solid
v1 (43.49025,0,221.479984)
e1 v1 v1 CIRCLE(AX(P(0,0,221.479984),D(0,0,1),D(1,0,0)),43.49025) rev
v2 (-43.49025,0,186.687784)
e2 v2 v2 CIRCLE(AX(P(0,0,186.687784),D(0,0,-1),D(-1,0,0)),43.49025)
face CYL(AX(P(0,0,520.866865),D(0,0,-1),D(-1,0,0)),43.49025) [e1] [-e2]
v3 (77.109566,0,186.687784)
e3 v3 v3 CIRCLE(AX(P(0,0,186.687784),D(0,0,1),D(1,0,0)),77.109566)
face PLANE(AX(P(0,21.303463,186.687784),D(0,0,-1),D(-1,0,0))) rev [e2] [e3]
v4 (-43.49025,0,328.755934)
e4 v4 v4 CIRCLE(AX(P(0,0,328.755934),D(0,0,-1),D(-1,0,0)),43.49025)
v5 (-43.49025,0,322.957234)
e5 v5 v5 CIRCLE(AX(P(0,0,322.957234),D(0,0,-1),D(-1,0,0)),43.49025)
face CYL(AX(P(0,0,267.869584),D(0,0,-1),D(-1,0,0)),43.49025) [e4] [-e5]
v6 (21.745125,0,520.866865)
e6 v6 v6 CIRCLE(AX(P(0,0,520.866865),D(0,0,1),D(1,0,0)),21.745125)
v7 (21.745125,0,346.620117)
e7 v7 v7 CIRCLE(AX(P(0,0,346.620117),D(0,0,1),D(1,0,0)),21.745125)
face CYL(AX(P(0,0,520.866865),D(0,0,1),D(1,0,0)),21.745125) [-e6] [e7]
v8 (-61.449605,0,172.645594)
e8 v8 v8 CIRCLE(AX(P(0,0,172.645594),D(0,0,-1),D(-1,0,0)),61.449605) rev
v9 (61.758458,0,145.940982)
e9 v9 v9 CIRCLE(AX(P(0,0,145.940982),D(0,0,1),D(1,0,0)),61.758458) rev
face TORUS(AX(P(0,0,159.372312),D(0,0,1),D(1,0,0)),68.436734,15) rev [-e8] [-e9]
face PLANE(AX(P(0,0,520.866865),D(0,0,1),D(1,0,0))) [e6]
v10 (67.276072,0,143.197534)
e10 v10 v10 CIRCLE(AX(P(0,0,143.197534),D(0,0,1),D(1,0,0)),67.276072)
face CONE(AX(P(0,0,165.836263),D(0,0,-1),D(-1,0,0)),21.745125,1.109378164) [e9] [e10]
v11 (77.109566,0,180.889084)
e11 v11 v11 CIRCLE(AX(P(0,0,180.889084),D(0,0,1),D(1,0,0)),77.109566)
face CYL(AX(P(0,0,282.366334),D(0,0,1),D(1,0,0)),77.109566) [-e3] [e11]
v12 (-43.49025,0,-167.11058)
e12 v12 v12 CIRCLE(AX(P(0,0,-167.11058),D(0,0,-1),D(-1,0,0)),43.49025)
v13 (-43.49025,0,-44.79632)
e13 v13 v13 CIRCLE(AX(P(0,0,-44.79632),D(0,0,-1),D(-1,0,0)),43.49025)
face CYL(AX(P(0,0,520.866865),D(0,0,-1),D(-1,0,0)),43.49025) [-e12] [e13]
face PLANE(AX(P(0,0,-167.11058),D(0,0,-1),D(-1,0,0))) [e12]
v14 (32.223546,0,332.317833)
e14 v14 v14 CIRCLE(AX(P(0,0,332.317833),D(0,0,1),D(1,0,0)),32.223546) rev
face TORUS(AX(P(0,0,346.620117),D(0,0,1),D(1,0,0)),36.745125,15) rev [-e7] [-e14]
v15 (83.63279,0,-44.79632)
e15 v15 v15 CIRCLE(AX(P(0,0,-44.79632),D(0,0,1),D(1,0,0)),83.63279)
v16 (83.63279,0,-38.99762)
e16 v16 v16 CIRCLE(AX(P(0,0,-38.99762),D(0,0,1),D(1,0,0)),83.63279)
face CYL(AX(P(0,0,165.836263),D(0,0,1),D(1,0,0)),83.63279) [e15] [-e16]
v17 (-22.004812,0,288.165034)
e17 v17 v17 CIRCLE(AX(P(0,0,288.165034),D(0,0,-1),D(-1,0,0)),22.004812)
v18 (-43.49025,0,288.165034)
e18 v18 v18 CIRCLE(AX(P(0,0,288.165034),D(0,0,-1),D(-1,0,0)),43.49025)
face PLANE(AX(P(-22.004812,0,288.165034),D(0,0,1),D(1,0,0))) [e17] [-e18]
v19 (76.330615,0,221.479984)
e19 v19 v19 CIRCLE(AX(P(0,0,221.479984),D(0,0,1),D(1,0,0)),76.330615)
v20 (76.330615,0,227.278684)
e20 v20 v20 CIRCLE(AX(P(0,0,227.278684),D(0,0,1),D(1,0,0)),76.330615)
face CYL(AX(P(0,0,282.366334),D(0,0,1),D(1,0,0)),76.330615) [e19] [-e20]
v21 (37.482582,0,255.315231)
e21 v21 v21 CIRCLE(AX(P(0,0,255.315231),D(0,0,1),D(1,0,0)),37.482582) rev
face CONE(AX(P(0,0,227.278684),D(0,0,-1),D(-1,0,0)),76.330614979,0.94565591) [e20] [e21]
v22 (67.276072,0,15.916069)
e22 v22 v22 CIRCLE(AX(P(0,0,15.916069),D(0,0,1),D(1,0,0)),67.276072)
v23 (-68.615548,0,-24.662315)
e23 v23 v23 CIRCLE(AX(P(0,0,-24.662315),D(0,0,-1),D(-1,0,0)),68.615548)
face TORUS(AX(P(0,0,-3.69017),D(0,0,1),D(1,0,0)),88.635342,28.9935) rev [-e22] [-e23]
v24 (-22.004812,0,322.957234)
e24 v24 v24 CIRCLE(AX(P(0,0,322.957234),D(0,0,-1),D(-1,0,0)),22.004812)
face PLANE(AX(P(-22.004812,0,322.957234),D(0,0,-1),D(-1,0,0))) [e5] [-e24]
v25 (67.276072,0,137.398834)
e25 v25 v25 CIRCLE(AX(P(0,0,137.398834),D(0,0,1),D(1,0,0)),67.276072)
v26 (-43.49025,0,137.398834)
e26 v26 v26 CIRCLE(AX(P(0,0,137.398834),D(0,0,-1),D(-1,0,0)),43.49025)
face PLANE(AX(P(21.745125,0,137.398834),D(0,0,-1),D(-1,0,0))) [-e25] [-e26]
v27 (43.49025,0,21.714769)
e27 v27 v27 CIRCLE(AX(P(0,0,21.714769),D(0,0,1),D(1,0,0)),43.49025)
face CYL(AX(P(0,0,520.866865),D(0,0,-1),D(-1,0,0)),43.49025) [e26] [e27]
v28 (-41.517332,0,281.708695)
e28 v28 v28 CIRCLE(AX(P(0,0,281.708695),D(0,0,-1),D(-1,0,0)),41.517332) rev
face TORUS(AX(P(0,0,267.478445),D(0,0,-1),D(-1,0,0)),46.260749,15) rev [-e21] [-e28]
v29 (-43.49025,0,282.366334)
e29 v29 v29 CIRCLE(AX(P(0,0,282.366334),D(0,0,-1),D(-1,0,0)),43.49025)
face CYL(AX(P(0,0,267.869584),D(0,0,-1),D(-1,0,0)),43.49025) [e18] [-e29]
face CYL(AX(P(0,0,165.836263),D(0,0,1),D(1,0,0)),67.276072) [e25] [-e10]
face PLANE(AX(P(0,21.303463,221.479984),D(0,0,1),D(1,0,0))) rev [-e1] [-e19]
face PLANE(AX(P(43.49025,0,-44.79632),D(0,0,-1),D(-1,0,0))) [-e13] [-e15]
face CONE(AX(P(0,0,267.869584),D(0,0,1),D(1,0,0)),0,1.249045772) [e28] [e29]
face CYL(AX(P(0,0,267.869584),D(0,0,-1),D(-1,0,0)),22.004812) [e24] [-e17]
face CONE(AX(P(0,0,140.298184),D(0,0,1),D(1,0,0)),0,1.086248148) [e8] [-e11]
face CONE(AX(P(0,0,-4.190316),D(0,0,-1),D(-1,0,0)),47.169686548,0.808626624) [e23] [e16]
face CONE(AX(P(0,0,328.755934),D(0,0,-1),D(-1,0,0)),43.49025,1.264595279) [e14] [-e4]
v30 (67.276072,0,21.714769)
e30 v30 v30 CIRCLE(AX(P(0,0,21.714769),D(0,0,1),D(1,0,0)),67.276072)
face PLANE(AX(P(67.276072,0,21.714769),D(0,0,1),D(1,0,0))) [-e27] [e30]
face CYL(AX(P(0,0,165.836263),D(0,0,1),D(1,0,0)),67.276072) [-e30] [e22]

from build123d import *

# Parameters (mm, degrees)
SKETCH1_R           = 14.999999999999998
BOSS_EXTRUDE1_DEPTH = 235.00000000000006
FILLET2_R           = 10
SKETCH4_W           = 104.26000000000013
SKETCH4_H           = 22.69462593232808
SKETCH10_R          = 15
BOSS_EXTRUDE2_DEPTH = 10
SCALE1_SCALE        = 1.9329
BOSS_EXTRUDE3_START = 40
SKETCH11_R          = 28.993500000000004
BOSS_EXTRUDE3_DEPTH = 40
FILLET3_R           = 10
FILLET5_R           = 10
FILLET6_R           = 10
FILLET7_R           = 10
SCALE2_SCALE        = 1.5
SKETCH12_R          = 43.49025000000001
CUT_EXTRUDE1_DEPTH  = 33.369805
SKETCH13_R          = 43.49025000000001
CUT_EXTRUDE2_DEPTH  = 20


with BuildPart() as part:
    # Sketch1 → Boss-Extrude1 (new body)
    with BuildSketch(Plane.XY):
        Circle(SKETCH1_R)
    extrude(amount=BOSS_EXTRUDE1_DEPTH)

    # Sketch2 → Revolve1 (revolve)
    with BuildSketch(Plane(origin=(0, 0, 0), x_dir=(1, 0, 0), z_dir=(0, 1, 0))):
        Polygon((0, -112.54820823836592), (0, -13.4987966999347), (11.119928350948882, -13.4987966999347), (11.119928350948882, -39.9), (15.000000000000005, -39.9), (28.84535837615048, -39.89999999999999), (28.845358376150482, -41.9), (16.269055666837332, -53.905209320131334), (23.203846346706012, -60.84), (23.203846346706015, -62.84), (7.5, -62.84), (7.4999999999999964, -102.74), (23.203846346706012, -102.74), (23.203846346706012, -104.74), (7.499999999999994, -112.54820823836592), align=None)
    revolve(axis=Axis((0, 0, 112.54820823836592), (0, 0, -1)))

    # Fillet2
    # the kernel refuses this fillet: 10 mm, written as the material it adds along each edge
    with BuildSketch(Plane(origin=(0, 0, 53.905209320131334), x_dir=(1, 0, 0), z_dir=(0, 1, 0))) as fillet2_piece_1:
        with BuildLine():
            CenterArc((30.57076321680232, -0.17250291395021122), FILLET2_R, 133.66910726980632, 88.8805373351795)
            Line((23.665838203316056, 7.060892592873103), (23.527739703046333, 7.205560503009572))
            Line((23.527739703046333, 7.205560503009572), (16.130957166567608, 0.1446679101364694))
            Line((16.130957166567608, 0.1446679101364694), (16.127634310600023, -0.14142135623730923))
            ThreePointArc((16.127634310600023, -0.14142135623730923), (19.595029650534364, -3.608816696171644), (23.05650800930409, -7.070036435187042))
            Line((23.05650800930409, -7.070036435187042), (23.203846346706015, -6.934790679868669))
        make_face()
    revolve(axis=Axis((0, 0, 53.905209320131334), (0, 0, -1)))
    with BuildSketch(Plane(origin=(0, 0, 108.81908605423119), x_dir=(1, 2.8e-16, 0), z_dir=(-2.8e-16, 1, 0))) as fillet2_piece_2:
        with BuildLine():
            CenterArc((14.999999999999998 + FILLET2_R, -FILLET2_R * 0.619575560585), FILLET2_R, 116.43731334282423, 63.56268665717579)
            Line((14.999999999999998 + FILLET2_R * 0.554781591202, FILLET2_R * 0.275846445214), (14.999999999999998 + FILLET2_R * 0.545877223026, FILLET2_R * 0.293754885329))
            Line((14.999999999999998 + FILLET2_R * 0.545877223026, FILLET2_R * 0.293754885329), (14.999999999999998 - FILLET2_R * 0.02, FILLET2_R * 0.0123915112117))
            Line((14.999999999999998 - FILLET2_R * 0.02, FILLET2_R * 0.0123915112117), (14.999999999999998 - FILLET2_R * 0.02, -FILLET2_R * 0.619575560585))
            Line((14.999999999999998 - FILLET2_R * 0.02, -FILLET2_R * 0.619575560585), (15, -FILLET2_R * 0.619575560585))
        make_face()
    revolve(axis=Axis((0, 0, 108.81908605423119), (0, 0, -1)))

    # Sketch3 → Revolve2 (revolve)
    with BuildSketch(Plane(origin=(0, 0, 0), x_dir=(0, 0, -1), z_dir=(1, 0, 0)), mode=Mode.PRIVATE) as revolve2_sk:
        Polygon((-130.74, 0), (-130.73999999999998, 14), (-128.73999999999995, 14), (-119.92783449185274, 1.1e-14), align=None)
    revolve(revolve2_sk.sketch.rotate(Axis((0, 1.1e-14, 119.92783449185274), (0, -1.02e-15, 1)), 90), axis=Axis((0, 1.1e-14, 119.92783449185274), (0, -1.02e-15, 1)))

    # Sketch4 → Cut-Revolve1 (revolve, cut)
    with BuildSketch(Plane(origin=(0, 0, 0), x_dir=(0, 0, -1), z_dir=(1, 0, 0)), mode=Mode.PRIVATE) as cut_revolve1_sk:
        with Locations((-182.87, -18.84731296616404)):
            Rectangle(SKETCH4_W, SKETCH4_H)
    revolve(cut_revolve1_sk.sketch.rotate(Axis((0, 0, 235.00000000000006), (0, 0, -1)), 90), axis=Axis((0, 0, 235.00000000000006), (0, 0, -1)), mode=Mode.SUBTRACT)

    # Sketch6 → Revolve4 (revolve)
    with BuildSketch(Plane(origin=(0, 0, 0), x_dir=(1, 0, 0), z_dir=(0, 1, 0))):
        Polygon((1.514e-14, -147.73999999999998), (1.829e-14, -173.48215721635322), (-14.999999999999986, -168.74), (-14.999999999999986, -166.74), (-7.589567298836239, -166.74), (-7.589567298836239, -154.73999999999998), (-14.999999999999986, -154.73999999999998), (-14.999999999999982, -152.73999999999998), align=None)
    revolve(axis=Axis((1.514e-14, 0, 147.73999999999998), (1.2e-16, 0, 1)))

    # Sketch8 → Revolve5 (revolve)
    with BuildSketch(Plane(origin=(0, 0, 0), x_dir=(0, 0, -1), z_dir=(1, 0, 0)), mode=Mode.PRIVATE) as revolve5_sk:
        Polygon((-152.73999999999998, 0), (-103.74000000000001, 0), (-117.74, 26.59546670677199), (-119.74, 26.59546670677199), (-119.74, 7.34766847272492), (-131.74, 7.34766847272492), (-131.74, 26.32680255189654), (-133.74, 26.32680255189654), align=None)
    revolve(revolve5_sk.sketch.rotate(Axis((0, 0, 152.73999999999998), (0, 0, -1)), 90), axis=Axis((0, 0, 152.73999999999998), (0, 0, -1)))

    # Sketch10 → Boss-Extrude2 (add)
    with BuildSketch(Plane.XY.offset(130.73999999999992)):
        with Locations(Location((0, 0, 0), (0, 0, 180))):
            Circle(SKETCH10_R)
    extrude(amount=BOSS_EXTRUDE2_DEPTH)


with BuildPart() as part_1:
    # Scale1: scaled about (0, 0, 88.197821602)
    add(part.part.scale(SCALE1_SCALE).moved(Location((0, 0, -82.27974777250581))))

    # Sketch11 → Boss-Extrude3 (add)
    with BuildSketch(Plane(origin=(0, 0, -82.27974777267455), x_dir=(-1, 0, 0), z_dir=(0, 0, -1)).offset(BOSS_EXTRUDE3_START)):
        Circle(SKETCH11_R)
    extrude(amount=-BOSS_EXTRUDE3_DEPTH)

    # Fillet3
    fillet3_edges = [part_1.edges().sort_by_distance(p)[0] for p in [
        (-29.95619321315706, -5.5e-15, 134.00840315083104),
    ]]
    fillet(fillet3_edges, radius=FILLET3_R)

    # Fillet5
    fillet5_edges = [part_1.edges().sort_by_distance(p)[0] for p in [
        (14.496749999993185, 4.19492707e-09, 248.4608560692405),
    ]]
    fillet(fillet5_edges, radius=FILLET5_R)

    # Fillet6
    # the kernel refuses this fillet: 10 mm, written as the material it adds along each edge
    with BuildSketch(Plane(origin=(-2.381562e-11, -3.695293e-11, 208.1191482274964), x_dir=(-1.0, 2.5486940639204283e-12, 0), z_dir=(-2.5486940639204283e-12, -1.0, 0))) as fillet6_piece_1:
        with BuildLine():
            CenterArc((24.364379904655884, 7.2517155656861405), FILLET6_R, 189.3328180990746, 62.23223307800339)
            Line((14.496750000023814, 5.630025069564624), (14.299397401931174, 5.597591259642201))
            ThreePointArc((14.299397401931174, 5.597591259642201), (14.296750000023817, 2.815012534782312), (14.296749999976186, 0))
            Line((14.296749999976186, 0), (14.433504446772817, -0.1897366596101051))
            Line((14.433504446772817, -0.1897366596101051), (21.13885669128414, -2.4248540744291063))
            Line((21.13885669128414, -2.4248540744291063), (21.202102244487506, -2.235117414819001))
        make_face()
    revolve(axis=Axis((-2.381562e-11, -3.695293e-11, 208.1191482274964), (0, 0, -1)))

    # Fillet7
    # the kernel refuses this fillet: 10 mm, written as the material it adds along each edge
    with BuildSketch(Plane(origin=(0, 0, 202.48912315793177), x_dir=(1, 2.8e-16, 0), z_dir=(-2.8e-16, 1, 0))) as fillet7_piece_1:
        with BuildLine():
            CenterArc((30.840499091800684, -0.5370158996013572), FILLET7_R, 125.81790747161939, 125.7471437054586)
            Line((24.988387693610907, 7.571793642074738), (24.40317655379193, 8.382674596242339))
            Line((24.40317655379193, 8.382674596242339), (13.911538860181022, 0.810880954167601))
            Line((13.911538860181022, 0.810880954167601), (13.509987009536637, -0.16216904961120804))
            ThreePointArc((13.509987009536637, -0.16216904961120804), (20.885874478501762, -8.813825782452454), (27.36199366561547, -10.972532178157024))
            Line((27.36199366561547, -10.972532178157024), (27.678221431632306, -10.023848880106499))
        make_face()
    revolve(axis=Axis((0, 0, 202.48912315793177), (0, 0, -1)), revolution_arc=180)
    with BuildSketch(Plane(origin=(0, 0, 202.48912315793177), x_dir=(-1, -1.8e-16, 0), z_dir=(1.8e-16, -1, 0))) as fillet7_piece_2:
        with BuildLine():
            CenterArc((30.84049909180068, -0.5370158996013572), FILLET7_R, 125.81790747161942, 125.74714370545857)
            Line((24.988387693610896, 7.571793642074738), (24.40317655379192, 8.382674596242339))
            Line((24.40317655379192, 8.382674596242339), (13.911538860181022, 0.810880954167601))
            Line((13.911538860181022, 0.810880954167601), (13.509987009536832, -0.16216904961237333))
            ThreePointArc((13.509987009536832, -0.16216904961237333), (20.885874478435156, -8.813825782430257), (27.361993665615465, -10.972532178157024))
            Line((27.361993665615465, -10.972532178157024), (27.678221431632302, -10.023848880106499))
        make_face()
    revolve(axis=Axis((0, 0, 202.48912315793177), (0, 0, -1)), revolution_arc=180)


with BuildPart() as part_2:
    # Scale2: scaled about (1e-08, -3.6e-08, 74.121527206)
    add(part_1.part.scale(SCALE2_SCALE).moved(Location((-5e-09, 1.8e-08, -37.060763603))))

    # Sketch12 → Cut-Extrude1 (cut)
    with BuildSketch(Plane(origin=(0, 0, -220.4803849628567), x_dir=(-1, 0, 0), z_dir=(0, 0, -1))):
        Circle(SKETCH12_R)
    extrude(amount=-CUT_EXTRUDE1_DEPTH, mode=Mode.SUBTRACT)

    # Sketch13 → Cut-Extrude2 (cut)
    with BuildSketch(Plane(origin=(0, 0, -187.11057996285672), x_dir=(-1, 0, 0), z_dir=(0, 0, -1))):
        Circle(SKETCH13_R)
    extrude(amount=-CUT_EXTRUDE2_DEPTH, mode=Mode.SUBTRACT)


solid = part_2.part
